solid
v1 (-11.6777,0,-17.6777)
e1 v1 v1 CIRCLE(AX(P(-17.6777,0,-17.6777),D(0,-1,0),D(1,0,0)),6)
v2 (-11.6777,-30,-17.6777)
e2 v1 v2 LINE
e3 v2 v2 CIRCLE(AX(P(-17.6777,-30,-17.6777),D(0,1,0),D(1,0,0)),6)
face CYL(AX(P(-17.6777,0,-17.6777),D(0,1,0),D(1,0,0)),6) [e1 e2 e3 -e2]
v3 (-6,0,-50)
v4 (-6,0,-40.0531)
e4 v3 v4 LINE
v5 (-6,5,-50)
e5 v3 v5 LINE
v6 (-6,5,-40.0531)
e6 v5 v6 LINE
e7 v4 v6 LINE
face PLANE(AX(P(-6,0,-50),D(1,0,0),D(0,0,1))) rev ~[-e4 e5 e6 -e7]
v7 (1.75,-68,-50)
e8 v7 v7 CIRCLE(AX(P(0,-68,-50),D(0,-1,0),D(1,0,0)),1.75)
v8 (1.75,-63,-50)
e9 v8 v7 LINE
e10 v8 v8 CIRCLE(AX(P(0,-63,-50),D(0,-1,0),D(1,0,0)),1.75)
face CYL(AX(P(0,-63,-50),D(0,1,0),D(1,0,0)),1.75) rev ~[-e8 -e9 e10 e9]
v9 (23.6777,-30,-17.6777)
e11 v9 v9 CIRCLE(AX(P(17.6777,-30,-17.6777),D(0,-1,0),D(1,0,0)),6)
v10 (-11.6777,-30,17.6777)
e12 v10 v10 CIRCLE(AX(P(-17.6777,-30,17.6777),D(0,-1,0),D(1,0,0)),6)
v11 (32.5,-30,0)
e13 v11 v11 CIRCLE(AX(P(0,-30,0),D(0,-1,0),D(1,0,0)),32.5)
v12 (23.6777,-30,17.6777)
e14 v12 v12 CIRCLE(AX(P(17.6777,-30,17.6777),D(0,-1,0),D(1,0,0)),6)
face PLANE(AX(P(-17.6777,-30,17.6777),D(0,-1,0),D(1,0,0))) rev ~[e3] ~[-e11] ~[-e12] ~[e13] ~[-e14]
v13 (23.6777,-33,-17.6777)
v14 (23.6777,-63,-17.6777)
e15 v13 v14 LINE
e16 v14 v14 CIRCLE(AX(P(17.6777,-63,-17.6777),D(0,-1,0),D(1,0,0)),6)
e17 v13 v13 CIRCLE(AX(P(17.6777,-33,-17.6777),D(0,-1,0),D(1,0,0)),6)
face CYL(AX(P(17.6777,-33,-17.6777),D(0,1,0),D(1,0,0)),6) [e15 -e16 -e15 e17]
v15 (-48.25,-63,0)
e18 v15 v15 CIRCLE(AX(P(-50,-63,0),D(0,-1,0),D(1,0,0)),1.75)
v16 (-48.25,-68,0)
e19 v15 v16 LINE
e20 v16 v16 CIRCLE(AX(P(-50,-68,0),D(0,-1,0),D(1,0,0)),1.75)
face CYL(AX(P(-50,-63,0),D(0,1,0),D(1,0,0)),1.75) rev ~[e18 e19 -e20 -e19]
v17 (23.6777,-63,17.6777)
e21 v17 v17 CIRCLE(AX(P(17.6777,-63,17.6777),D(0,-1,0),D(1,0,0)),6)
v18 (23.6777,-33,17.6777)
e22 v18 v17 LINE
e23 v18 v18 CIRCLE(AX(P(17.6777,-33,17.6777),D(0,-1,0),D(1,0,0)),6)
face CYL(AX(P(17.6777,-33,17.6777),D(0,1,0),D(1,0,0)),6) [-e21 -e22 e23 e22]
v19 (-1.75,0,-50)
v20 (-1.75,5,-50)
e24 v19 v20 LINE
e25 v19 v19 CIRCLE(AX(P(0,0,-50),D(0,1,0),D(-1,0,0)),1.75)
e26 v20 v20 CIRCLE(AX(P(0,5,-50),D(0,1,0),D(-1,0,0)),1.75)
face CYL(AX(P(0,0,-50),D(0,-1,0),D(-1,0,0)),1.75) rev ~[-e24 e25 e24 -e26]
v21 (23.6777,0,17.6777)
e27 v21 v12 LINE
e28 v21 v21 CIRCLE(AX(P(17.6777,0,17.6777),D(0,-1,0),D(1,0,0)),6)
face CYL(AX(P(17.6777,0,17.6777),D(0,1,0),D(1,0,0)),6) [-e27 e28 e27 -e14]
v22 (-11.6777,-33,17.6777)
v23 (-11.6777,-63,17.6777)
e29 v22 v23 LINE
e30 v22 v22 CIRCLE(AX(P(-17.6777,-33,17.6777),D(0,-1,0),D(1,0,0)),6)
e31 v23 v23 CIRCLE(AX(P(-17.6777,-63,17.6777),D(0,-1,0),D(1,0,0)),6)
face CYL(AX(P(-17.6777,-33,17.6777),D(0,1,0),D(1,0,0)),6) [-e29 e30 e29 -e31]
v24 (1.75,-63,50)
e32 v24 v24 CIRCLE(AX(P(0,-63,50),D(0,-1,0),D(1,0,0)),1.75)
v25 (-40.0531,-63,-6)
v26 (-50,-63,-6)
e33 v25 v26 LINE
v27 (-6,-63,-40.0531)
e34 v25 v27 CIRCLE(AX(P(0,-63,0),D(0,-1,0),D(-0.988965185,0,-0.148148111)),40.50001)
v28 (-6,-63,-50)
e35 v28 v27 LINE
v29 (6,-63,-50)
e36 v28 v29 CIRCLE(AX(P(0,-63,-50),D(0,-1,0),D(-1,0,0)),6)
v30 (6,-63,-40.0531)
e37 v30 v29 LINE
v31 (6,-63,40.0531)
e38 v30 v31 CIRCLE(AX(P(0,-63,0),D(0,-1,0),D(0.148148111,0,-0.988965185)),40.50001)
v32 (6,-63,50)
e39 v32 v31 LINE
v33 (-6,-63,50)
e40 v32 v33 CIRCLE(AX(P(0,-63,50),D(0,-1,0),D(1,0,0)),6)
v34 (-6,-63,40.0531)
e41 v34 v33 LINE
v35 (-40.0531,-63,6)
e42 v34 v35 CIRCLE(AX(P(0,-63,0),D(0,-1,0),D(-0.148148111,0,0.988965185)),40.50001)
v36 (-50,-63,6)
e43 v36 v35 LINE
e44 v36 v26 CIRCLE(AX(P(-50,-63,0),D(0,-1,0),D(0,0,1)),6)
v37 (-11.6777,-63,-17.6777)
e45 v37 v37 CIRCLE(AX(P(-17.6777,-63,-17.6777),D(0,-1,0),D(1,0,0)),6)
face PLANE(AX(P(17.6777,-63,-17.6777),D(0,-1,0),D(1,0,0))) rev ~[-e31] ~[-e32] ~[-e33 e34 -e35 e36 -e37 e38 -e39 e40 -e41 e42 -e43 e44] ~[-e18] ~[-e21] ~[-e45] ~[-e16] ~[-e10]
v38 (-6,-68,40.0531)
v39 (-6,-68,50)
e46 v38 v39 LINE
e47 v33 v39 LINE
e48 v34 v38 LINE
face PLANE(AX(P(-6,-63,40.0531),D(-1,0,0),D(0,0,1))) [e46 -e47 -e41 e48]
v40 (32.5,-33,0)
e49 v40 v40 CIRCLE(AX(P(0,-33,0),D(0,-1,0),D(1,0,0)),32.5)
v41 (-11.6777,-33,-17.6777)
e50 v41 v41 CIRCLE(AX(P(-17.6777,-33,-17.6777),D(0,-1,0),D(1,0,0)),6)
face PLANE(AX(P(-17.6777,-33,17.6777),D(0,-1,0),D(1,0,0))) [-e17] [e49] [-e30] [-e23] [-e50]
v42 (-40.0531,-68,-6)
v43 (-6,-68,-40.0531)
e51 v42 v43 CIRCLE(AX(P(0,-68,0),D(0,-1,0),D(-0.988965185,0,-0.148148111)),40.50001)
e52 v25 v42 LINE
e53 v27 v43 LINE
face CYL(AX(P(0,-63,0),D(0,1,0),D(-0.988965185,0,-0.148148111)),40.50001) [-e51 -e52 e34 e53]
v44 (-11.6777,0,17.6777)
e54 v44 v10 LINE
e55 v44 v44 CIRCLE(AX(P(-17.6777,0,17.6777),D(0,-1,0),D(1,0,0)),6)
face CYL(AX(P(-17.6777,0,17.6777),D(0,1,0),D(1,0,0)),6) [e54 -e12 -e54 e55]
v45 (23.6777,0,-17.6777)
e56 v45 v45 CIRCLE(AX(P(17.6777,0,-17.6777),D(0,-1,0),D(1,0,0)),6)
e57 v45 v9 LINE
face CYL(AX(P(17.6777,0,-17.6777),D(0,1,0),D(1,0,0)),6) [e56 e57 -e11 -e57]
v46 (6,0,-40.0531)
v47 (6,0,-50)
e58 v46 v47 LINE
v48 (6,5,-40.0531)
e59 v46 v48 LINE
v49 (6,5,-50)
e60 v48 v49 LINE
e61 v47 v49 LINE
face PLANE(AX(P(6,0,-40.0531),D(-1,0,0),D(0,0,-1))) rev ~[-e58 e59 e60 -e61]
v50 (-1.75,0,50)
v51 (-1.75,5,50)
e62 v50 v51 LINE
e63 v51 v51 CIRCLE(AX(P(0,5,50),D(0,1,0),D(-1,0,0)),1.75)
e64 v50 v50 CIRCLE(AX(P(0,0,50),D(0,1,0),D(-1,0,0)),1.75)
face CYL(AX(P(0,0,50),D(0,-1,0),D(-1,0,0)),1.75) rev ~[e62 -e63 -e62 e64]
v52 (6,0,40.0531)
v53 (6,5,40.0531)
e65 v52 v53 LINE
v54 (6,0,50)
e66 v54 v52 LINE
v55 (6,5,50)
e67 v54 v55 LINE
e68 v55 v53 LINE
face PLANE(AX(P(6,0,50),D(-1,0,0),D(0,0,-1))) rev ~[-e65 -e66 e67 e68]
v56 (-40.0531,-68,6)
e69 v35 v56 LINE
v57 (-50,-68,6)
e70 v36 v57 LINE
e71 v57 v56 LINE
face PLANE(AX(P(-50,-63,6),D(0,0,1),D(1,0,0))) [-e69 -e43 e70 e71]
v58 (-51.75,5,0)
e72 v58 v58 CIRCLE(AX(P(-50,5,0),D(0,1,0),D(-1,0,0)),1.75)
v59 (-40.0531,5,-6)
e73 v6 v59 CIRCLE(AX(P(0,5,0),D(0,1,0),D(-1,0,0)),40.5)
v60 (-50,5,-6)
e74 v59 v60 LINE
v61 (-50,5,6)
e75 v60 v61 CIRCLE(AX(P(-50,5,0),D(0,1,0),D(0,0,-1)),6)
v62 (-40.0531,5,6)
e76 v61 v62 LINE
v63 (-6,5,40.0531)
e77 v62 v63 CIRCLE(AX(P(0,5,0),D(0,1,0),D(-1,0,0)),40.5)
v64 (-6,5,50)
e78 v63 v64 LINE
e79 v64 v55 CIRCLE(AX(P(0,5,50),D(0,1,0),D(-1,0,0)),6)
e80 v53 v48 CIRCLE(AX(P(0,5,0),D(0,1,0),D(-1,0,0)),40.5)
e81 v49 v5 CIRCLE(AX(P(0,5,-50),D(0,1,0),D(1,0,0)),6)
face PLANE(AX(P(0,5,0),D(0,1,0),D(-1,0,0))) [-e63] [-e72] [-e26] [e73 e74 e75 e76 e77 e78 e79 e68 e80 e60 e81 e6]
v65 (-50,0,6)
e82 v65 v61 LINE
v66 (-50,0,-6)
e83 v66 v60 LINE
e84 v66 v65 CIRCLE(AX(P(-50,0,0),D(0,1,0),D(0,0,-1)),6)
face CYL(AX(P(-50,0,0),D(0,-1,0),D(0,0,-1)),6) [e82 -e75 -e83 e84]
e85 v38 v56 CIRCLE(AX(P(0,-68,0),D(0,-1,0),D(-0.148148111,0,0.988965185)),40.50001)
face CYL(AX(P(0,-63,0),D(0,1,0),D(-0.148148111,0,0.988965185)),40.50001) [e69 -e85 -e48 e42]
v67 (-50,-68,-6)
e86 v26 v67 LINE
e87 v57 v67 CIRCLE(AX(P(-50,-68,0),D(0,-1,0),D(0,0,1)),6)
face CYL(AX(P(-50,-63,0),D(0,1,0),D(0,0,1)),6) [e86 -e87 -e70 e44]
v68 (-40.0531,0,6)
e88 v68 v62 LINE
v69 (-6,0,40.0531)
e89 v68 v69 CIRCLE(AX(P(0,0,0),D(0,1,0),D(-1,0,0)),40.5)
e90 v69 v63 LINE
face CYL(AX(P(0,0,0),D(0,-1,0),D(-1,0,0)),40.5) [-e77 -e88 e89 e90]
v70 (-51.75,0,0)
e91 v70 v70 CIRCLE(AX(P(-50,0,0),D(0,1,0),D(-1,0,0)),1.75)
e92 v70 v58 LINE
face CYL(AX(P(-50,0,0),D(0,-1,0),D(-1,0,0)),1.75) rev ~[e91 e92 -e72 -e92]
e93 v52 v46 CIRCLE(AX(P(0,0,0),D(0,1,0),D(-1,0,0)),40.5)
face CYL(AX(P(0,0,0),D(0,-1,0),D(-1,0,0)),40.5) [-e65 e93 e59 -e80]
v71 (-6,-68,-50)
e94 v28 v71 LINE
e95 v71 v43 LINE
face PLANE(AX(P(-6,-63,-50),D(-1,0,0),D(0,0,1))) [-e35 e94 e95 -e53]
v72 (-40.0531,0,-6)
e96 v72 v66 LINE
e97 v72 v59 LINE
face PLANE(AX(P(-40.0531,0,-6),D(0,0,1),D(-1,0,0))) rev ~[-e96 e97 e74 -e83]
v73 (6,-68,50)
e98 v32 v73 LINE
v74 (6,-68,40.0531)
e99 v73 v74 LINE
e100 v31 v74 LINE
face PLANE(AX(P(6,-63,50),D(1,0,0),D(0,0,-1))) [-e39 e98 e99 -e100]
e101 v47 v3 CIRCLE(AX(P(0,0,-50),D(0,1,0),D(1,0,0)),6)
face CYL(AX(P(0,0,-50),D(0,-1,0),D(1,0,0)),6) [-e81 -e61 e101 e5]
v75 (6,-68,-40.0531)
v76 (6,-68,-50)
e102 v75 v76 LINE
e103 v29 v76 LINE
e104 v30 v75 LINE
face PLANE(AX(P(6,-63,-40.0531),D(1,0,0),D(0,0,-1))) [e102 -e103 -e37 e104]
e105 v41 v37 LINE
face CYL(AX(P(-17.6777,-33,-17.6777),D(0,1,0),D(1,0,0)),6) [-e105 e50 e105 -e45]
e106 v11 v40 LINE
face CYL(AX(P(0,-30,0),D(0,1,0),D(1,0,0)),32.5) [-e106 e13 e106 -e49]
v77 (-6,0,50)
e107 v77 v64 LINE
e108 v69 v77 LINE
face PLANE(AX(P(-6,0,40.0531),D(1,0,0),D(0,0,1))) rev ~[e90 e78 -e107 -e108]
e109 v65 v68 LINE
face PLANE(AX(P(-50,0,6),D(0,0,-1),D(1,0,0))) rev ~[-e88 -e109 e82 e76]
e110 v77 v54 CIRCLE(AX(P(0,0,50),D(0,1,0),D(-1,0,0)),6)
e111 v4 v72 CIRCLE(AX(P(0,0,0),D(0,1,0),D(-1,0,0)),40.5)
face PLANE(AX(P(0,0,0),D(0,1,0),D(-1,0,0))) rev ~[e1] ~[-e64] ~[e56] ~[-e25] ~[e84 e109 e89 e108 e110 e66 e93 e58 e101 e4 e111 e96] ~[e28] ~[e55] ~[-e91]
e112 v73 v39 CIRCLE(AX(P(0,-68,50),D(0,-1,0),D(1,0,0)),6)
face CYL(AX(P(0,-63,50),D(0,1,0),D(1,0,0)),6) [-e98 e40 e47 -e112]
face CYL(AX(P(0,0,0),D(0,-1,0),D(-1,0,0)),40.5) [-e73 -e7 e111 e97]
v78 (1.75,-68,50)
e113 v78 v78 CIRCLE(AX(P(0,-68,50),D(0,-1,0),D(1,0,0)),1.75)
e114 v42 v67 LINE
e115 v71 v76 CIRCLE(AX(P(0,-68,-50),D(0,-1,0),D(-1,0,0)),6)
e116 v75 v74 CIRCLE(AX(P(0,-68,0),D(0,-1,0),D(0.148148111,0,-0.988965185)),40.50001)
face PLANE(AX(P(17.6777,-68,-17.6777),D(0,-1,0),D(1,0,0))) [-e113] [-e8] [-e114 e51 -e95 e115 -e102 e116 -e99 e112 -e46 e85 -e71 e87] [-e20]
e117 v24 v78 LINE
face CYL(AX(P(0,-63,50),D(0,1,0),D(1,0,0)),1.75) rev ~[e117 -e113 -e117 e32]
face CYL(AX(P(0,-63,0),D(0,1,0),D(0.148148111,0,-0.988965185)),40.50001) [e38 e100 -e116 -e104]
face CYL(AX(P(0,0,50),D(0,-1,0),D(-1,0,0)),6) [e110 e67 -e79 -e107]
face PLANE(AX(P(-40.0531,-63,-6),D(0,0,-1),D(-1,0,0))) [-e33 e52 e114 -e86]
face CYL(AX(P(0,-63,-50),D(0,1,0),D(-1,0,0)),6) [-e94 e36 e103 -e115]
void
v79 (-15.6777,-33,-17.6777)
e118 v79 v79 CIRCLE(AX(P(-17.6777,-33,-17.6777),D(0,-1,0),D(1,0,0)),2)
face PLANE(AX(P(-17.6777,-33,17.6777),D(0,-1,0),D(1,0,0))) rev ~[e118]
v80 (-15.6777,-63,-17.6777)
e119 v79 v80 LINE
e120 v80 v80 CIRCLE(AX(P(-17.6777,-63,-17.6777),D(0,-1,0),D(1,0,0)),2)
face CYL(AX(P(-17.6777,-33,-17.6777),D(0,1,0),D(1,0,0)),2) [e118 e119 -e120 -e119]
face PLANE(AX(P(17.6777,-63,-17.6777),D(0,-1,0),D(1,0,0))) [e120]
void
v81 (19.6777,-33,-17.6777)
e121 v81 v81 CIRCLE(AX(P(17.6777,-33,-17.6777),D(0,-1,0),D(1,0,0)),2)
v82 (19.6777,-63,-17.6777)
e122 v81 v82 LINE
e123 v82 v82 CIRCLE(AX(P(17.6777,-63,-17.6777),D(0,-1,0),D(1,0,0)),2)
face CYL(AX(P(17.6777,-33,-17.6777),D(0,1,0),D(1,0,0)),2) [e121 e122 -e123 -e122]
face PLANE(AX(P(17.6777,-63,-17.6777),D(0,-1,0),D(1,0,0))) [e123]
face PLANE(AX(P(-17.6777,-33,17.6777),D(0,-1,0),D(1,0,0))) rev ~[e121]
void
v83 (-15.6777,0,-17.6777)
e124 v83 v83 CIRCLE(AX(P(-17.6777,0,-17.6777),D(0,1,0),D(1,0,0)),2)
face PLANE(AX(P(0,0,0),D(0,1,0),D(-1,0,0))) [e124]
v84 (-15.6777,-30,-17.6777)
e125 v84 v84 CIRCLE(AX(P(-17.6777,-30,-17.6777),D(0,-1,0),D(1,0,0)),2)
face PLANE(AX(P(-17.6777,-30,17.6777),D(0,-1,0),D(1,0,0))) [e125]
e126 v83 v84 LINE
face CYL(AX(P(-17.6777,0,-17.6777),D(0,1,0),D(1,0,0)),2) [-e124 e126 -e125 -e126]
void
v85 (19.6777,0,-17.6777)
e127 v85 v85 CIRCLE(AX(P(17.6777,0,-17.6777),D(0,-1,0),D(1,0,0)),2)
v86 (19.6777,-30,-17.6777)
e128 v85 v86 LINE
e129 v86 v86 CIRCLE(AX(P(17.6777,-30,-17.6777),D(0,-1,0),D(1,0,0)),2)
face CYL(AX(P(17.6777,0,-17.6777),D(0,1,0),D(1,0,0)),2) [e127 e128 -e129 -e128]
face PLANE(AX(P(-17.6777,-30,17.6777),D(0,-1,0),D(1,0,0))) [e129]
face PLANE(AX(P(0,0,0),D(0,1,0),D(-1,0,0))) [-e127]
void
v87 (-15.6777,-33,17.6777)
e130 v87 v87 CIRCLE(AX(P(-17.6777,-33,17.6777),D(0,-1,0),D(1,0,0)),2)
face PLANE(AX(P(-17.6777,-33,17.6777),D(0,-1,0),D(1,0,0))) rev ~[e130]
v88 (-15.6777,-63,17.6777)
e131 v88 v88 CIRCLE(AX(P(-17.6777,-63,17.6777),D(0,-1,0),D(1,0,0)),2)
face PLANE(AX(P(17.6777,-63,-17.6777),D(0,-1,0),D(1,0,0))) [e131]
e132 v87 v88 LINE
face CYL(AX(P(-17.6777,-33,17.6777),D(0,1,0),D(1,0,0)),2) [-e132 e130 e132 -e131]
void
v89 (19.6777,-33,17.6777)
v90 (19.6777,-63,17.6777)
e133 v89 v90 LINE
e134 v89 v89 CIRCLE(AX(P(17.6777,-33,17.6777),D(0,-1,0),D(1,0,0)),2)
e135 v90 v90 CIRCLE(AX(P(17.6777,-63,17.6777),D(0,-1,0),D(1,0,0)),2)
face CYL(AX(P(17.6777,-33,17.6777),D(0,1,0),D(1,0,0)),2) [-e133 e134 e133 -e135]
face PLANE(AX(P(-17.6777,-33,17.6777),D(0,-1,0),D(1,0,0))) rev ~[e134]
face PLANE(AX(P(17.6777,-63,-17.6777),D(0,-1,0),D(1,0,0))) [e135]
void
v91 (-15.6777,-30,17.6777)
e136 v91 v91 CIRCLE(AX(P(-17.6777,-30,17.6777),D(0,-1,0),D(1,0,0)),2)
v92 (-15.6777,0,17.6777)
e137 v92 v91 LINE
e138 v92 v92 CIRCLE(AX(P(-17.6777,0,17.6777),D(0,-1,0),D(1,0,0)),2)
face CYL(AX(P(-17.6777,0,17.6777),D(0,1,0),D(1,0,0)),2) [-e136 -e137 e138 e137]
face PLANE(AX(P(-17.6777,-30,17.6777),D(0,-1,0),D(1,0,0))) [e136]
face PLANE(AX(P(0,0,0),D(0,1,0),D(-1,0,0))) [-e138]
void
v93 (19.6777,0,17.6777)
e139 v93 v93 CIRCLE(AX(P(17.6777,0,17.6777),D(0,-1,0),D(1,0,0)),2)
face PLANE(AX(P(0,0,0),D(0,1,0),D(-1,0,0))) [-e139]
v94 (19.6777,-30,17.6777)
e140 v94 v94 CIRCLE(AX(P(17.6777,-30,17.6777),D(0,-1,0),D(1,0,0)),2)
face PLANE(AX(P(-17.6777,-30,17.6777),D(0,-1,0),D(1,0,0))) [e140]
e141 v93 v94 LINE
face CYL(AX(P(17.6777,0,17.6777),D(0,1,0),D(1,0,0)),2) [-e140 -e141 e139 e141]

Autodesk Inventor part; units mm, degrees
ref_plane "YZ Plane" through (0, 0, 0) normal (1, 0, 0) x (0, 1, 0)
ref_plane "XZ Plane" through (0, 0, 0) normal (0, 1, 0) x (-1, 0, 0)
ref_plane "XY Plane" through (0, 0, 0) normal (0, 0, 1) x (1, 0, 0)
sketch "Sketch1" plane through (0, 0, 0) normal (0, 1, 0) x (-1, 0, 0)
  circle A0 centre (0, 0) radius 40.5
  circle A1 centre (0, 0) radius 39
  line L0 (0, 50) -> (0, -50) construction
  arc A2 (6, 50) -> (-6, 50) centre (0, 50) ccw
  arc A3 (-6, -50) -> (6, -50) centre (0, -50) ccw
  line L1 (0, 0) -> (50, 0) construction
  arc A4 (50, -6) -> (50, 6) centre (50, 0) ccw
  line L2 (0, 0) -> (50, 0) construction
  line L3 (50, 6) -> (40.0531, 6)
  line L4 (40.0531, -6) -> (50, -6)
  line L5 (6, 40.0531) -> (6, 50)
  line L6 (-6, 50) -> (-6, 40.0531)
  line L7 (-6, -40.0531) -> (-6, -50)
  line L8 (6, -50) -> (6, -40.0531)
  circle A5 centre (50, 0) radius 1.75
  circle A6 centre (0, -50) radius 1.75
  circle A7 centre (0, 50) radius 1.75
  point P0 (25, 0)
  dimension "d0" = 81
  dimension "d1" = 78
  dimension "d2" = 100
  dimension "d3" = 12
  dimension "d4" = 50
  dimension "d5" = 50
  dimension "d6" = 0
  dimension "d7" = 12
  dimension "d8" = 3.5
  dimension "d9" = 3.5
  dimension "d10" = 3.5
extrude "Extrusion1" add sketch "Sketch1" along normal blind 5 contours A0 | A0 L3 A4 L4 | A0 L6 A2 L5 | L8 A3 L7 A0 | A1
sketch "Sketch2" plane through (0, 0, 0) normal (0, -1, 0) x (1, 0, 0)
  line L0 (0, 0) -> (-17.6777, -17.6777)
  line L1 (0, 0) -> (25, 0) construction
  circle A0 centre (-17.6777, -17.6777) radius 6
  circle A1 centre (17.6777, -17.6777) radius 6
  circle A2 centre (17.6777, 17.6777) radius 6
  circle A3 centre (-17.6777, 17.6777) radius 6
  circle A4 centre (17.6777, -17.6777) radius 2
  circle A5 centre (-17.6777, -17.6777) radius 2
  circle A6 centre (17.6777, 17.6777) radius 2
  circle A7 centre (-17.6777, 17.6777) radius 2
  dimension "d13" = 25
  dimension "d14" = 135
  dimension "d15" = 12
  dimension "d18" = 360
  dimension "d22" = 4
  dimension "d23" = 4
  dimension "d24" = 4
  dimension "d25" = 4
extrude "Extrusion2" add sketch "Sketch2" along normal blind 30
sketch "Sketch3" plane through (-17.6777, -30, 17.6777) normal (0, -1, 0) x (1, 0, 0)
  circle A0 centre (17.6777, -17.6777) radius 32.5
  dimension "d26" = 65
extrude "Extrusion3" add sketch "Sketch3" along normal blind 3
sketch "Sketch4" plane through (0, -33, 0) normal (0, -1, 0) x (1, 0, 0)
  circle A0 centre (17.6777, 17.6777) radius 6 projected
  circle A1 centre (17.6777, 17.6777) radius 2 projected
  circle A2 centre (17.6777, -17.6777) radius 2 projected
  circle A3 centre (17.6777, -17.6777) radius 6 projected
  circle A4 centre (-17.6777, 17.6777) radius 2 projected
  circle A5 centre (-17.6777, 17.6777) radius 6 projected
  circle A6 centre (-17.6777, -17.6777) radius 2 projected
  circle A7 centre (-17.6777, -17.6777) radius 6 projected
  point P0 (0, 0)
extrude "Extrusion4" add sketch "Sketch4" along normal blind 30
sketch "Sketch5" plane through (17.6777, -63, -17.6777) normal (0, -1, 0) x (1, 0, 0)
  circle A0 centre (0, 35.3553) radius 6 projected
  circle A1 centre (-35.3553, 0) radius 6 projected
  circle A2 centre (0, 0) radius 6 projected
  circle A3 centre (-35.3553, 35.3553) radius 6 projected
  circle A4 centre (-67.6777, 17.6777) radius 1.75 projected
  circle A5 centre (-17.6777, -32.3223) radius 1.75 projected
  circle A6 centre (-17.6777, 67.6777) radius 1.75 projected
  arc A7 (-23.6777, -32.3223) -> (-11.6777, -32.3223) centre (-17.6777, -32.3223) ccw projected
  line L0 (-11.6777, -22.3754) -> (-11.6777, -32.3223) projected
  arc A8 (-11.6777, -22.3754) -> (-11.6777, 57.7308) centre (-17.6777, 17.6777) ccw projected
  line L1 (-11.6777, 67.6777) -> (-11.6777, 57.7308) projected
  arc A9 (-11.6777, 67.6777) -> (-23.6777, 67.6777) centre (-17.6777, 67.6777) ccw projected
  line L2 (-23.6777, 57.7308) -> (-23.6777, 67.6777) projected
  arc A10 (-23.6777, 57.7308) -> (-57.7308, 23.6777) centre (-17.6777, 17.6777) ccw projected
  line L3 (-67.6777, 23.6777) -> (-57.7308, 23.6777) projected
  arc A11 (-67.6777, 23.6777) -> (-67.6777, 11.6777) centre (-67.6777, 17.6777) ccw projected
  line L4 (-57.7308, 11.6777) -> (-67.6777, 11.6777) projected
  arc A12 (-57.7308, 11.6777) -> (-23.6777, -22.3754) centre (-17.6777, 17.6777) ccw projected
  line L5 (-23.6777, -32.3223) -> (-23.6777, -22.3754) projected
extrude "Extrusion5" add sketch "Sketch5" along normal blind 5 contours A0 | A1 | A2 | A3 | L5 A12 L4 A11 L3 A10 L2 A9 L1 A8 L0 A7
properties part number "Height_upgrade"
